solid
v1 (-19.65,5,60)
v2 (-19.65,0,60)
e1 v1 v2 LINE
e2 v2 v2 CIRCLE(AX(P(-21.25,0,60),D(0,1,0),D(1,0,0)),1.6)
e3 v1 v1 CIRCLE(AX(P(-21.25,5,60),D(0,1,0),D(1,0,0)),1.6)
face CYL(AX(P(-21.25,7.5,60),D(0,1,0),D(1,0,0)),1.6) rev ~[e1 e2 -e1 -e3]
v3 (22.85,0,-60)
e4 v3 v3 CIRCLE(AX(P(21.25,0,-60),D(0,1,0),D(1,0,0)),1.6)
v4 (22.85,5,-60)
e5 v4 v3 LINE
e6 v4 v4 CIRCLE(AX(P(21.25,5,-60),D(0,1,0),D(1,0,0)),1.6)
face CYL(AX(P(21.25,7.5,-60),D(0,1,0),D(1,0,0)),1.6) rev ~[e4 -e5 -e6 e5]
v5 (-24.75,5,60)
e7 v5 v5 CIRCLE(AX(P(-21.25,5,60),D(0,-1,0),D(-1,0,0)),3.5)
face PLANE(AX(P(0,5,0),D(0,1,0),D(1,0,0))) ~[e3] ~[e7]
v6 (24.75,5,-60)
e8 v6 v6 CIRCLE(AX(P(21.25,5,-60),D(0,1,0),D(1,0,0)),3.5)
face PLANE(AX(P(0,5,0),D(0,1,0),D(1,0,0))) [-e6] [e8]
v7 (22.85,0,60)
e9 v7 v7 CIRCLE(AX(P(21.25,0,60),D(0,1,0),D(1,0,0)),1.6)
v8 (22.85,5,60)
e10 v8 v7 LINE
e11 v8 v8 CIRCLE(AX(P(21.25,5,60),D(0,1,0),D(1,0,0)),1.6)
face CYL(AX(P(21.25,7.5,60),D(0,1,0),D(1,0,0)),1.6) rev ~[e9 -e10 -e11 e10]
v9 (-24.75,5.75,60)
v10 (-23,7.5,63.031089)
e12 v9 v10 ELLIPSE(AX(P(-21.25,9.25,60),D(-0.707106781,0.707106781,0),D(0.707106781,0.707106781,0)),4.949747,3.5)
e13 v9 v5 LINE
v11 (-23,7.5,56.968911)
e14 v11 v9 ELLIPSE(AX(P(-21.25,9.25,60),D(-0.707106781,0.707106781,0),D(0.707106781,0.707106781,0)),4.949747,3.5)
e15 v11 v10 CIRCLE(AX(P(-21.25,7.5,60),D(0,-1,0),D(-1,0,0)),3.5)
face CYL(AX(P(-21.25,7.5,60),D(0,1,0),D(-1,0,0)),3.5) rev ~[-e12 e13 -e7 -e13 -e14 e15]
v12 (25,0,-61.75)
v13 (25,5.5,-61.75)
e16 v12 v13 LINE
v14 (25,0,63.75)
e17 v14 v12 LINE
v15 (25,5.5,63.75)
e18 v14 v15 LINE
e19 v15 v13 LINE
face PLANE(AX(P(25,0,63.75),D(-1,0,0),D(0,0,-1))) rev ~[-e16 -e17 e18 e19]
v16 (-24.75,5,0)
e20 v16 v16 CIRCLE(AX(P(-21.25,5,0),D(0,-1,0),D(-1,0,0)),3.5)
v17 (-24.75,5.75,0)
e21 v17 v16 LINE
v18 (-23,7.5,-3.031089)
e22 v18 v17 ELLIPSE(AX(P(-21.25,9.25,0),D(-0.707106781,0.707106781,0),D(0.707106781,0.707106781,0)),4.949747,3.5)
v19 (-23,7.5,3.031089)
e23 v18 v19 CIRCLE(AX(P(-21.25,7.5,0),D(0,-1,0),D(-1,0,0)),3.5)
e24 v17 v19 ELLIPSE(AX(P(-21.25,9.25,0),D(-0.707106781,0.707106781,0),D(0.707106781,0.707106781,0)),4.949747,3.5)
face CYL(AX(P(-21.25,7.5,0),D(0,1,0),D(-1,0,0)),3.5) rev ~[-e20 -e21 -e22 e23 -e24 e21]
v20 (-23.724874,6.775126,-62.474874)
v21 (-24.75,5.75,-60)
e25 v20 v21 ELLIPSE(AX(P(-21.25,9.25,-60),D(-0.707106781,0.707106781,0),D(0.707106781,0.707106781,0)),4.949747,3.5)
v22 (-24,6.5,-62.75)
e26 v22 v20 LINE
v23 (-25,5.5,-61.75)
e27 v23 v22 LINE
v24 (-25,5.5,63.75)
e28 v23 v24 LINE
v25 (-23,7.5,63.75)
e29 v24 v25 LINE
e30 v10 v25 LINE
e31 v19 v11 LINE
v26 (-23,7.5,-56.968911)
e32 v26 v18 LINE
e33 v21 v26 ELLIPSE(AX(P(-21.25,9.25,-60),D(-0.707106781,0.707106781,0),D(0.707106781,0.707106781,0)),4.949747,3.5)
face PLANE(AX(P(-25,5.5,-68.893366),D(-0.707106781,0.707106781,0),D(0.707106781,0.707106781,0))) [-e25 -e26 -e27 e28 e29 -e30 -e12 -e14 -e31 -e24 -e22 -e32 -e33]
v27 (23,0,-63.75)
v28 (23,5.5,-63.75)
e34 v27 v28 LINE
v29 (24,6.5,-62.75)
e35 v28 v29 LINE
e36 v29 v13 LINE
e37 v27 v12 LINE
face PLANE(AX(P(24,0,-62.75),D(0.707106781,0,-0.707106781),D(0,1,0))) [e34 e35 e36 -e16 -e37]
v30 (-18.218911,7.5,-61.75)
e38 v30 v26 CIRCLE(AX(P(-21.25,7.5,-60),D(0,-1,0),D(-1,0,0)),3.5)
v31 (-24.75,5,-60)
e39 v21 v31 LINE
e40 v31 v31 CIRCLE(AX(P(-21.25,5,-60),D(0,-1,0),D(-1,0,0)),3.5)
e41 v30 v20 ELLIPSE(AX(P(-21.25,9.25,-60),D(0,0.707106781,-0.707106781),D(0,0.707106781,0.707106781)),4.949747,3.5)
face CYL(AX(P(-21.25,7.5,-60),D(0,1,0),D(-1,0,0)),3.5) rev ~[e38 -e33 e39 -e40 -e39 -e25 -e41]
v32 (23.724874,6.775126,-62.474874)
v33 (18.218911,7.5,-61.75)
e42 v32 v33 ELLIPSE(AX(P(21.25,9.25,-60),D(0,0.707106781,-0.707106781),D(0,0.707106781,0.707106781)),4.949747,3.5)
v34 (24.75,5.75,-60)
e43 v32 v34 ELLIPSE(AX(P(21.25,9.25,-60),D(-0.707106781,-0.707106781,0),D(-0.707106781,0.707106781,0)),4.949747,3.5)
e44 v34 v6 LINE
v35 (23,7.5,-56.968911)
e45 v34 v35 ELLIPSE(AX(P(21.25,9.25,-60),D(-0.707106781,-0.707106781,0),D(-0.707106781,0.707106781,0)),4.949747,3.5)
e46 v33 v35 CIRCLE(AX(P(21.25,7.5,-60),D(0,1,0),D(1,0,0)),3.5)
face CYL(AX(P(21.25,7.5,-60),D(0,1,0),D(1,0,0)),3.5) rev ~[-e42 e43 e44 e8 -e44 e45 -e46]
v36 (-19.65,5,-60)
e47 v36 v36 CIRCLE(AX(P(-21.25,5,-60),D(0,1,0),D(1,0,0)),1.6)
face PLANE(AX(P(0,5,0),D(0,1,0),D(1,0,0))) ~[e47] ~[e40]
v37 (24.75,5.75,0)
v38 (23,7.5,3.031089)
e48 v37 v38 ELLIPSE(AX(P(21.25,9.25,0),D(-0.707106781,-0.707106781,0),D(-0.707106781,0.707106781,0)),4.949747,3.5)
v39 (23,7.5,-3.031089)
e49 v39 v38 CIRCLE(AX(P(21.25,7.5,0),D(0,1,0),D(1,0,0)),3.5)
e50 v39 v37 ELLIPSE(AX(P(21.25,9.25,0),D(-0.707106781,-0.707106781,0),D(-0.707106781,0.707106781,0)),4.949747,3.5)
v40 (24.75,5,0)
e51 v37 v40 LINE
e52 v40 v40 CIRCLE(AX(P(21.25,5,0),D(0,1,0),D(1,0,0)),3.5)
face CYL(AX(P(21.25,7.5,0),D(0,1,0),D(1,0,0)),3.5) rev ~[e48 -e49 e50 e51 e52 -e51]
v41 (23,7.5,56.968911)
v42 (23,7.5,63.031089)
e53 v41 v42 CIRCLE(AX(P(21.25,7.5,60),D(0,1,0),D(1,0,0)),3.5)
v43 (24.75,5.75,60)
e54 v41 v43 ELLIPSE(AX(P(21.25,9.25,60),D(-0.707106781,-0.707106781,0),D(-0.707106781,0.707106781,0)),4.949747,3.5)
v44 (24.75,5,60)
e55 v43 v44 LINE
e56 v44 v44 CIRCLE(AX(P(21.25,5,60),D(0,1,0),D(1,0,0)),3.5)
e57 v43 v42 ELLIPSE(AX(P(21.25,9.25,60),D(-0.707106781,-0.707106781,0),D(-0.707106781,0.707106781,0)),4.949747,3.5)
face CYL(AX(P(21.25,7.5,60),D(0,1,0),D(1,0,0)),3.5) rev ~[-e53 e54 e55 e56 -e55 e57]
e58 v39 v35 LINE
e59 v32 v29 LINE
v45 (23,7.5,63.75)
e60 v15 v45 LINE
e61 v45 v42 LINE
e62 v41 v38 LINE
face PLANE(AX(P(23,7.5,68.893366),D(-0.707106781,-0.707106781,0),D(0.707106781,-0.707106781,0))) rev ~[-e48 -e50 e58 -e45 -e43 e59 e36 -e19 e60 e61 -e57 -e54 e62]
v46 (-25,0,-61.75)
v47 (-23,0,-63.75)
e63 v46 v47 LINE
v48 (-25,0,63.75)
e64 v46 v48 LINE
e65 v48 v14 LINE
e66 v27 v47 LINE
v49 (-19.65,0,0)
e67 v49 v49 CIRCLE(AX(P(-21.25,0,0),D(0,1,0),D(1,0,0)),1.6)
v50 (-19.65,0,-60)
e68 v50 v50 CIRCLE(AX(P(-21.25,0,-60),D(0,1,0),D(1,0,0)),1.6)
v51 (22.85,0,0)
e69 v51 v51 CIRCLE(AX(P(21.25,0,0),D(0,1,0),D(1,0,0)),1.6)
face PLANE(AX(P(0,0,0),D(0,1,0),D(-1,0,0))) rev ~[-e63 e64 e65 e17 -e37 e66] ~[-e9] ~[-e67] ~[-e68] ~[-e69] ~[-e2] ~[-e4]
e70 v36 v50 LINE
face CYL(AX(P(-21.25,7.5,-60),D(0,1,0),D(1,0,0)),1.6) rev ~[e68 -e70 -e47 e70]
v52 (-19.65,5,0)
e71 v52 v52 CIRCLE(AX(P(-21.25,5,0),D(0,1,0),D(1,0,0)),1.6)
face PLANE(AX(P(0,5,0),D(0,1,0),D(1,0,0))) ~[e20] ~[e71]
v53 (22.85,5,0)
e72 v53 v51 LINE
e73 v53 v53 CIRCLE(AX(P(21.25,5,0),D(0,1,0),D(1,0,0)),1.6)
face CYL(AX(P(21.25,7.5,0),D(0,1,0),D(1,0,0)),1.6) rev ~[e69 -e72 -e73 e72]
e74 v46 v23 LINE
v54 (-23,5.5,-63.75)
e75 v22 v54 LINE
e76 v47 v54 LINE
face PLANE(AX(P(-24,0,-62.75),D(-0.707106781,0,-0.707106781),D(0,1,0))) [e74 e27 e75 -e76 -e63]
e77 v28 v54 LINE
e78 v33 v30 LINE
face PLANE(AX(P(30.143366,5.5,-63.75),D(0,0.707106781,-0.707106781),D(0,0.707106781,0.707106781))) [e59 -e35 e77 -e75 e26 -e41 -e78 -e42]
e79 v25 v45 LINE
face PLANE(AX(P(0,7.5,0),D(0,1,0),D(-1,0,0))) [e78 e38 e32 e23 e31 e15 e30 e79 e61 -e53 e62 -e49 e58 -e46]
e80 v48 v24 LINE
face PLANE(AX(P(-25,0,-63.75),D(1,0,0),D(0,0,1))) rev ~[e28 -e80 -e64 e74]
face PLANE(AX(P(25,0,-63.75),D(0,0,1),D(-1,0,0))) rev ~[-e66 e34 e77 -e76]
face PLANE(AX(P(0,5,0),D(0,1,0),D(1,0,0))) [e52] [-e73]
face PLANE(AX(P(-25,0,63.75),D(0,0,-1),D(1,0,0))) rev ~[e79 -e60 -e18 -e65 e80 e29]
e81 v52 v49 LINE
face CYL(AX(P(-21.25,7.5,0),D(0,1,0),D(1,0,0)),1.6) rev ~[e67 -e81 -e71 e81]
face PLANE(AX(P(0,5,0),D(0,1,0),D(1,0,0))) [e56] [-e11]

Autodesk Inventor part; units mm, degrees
ref_plane "YZ Plane" through (0, 0, 0) normal (1, 0, 0) x (0, 1, 0)
ref_plane "XZ Plane" through (0, 0, 0) normal (0, 1, 0) x (-1, 0, 0)
ref_plane "XY Plane" through (0, 0, 0) normal (0, 0, 1) x (1, 0, 0)
sketch "Sketch1" plane through (0, 0, 0) normal (0, 1, 0) x (-1, 0, 0)
  line L0 (25, 63.75) -> (-25, 63.75)
  line L1 (-25, 63.75) -> (-25, -63.75)
  line L2 (-25, -63.75) -> (25, -63.75)
  line L3 (25, -63.75) -> (25, 63.75)
  point P0 (0, 0)
  dimension "d0" = 50
  dimension "d1" = 127.5
  dimension "d2" = 25
  dimension "d3" = 63.75
extrude "Extrusion1" add sketch "Sketch1" along normal blind 7.5
sketch "Sketch2" plane through (0, 7.5, 0) normal (0, 1, 0) x (1, 0, 0)
  circle A0 centre (-21.25, -60) radius 1.6
  circle A1 centre (-21.25, 60) radius 1.6
  circle A2 centre (21.25, -60) radius 1.6
  circle A3 centre (21.25, 60) radius 1.6
  circle A4 centre (-21.25, 0) radius 1.6
  circle A5 centre (21.25, 0) radius 1.6
  line L0 (25, -63.75) -> (25, 63.75) projected
  line L1 (25, 63.75) -> (-25, 63.75) projected
  line L2 (-25, -63.75) -> (25, -63.75) projected
  line L3 (-25, 63.75) -> (-25, -63.75) projected
  point P0 (0, 0)
  dimension "d6" = 3.2
  dimension "d7" = 3.2
  dimension "d8" = 3.2
  dimension "d9" = 3.2
  dimension "d10" = 3.2
  dimension "d11" = 3.2
  dimension "d12" = 3.75
  dimension "d13" = 3.75
  dimension "d14" = 3.75
  dimension "d15" = 3.75
  dimension "d16" = 3.75
  dimension "d17" = 3.75
  dimension "d18" = 3.75
  dimension "d19" = 3.75
  dimension "d20" = 3.75
  dimension "d21" = 3.75
  dimension "d22" = 63.75
  dimension "d23" = 63.75
extrude "Extrusion2" cut sketch "Sketch2" against normal through all contours A0 | A1 | A2 | A3 | A4 | A5
sketch "Sketch3" plane through (0, 7.5, 0) normal (0, 1, 0) x (1, 0, 0)
  circle A0 centre (21.25, -60) radius 1.6 projected
  circle A1 centre (21.25, -60) radius 3.5
  circle A2 centre (21.25, 0) radius 1.6 projected
  circle A3 centre (21.25, 0) radius 3.5
  circle A4 centre (21.25, 60) radius 3.5
  line L0 (25, 63.75) -> (-25, 63.75) projected
  line L1 (25, -63.75) -> (25, 63.75) projected
  point P0 (0, 0)
  dimension "d26" = 7
  dimension "d27" = 7
  dimension "d28" = 7
  dimension "d29" = 3.75
  dimension "d30" = 3.75
extrude "Extrusion3" cut sketch "Sketch3" against normal blind 2.5
mirror "Mirror1" about plane through (0, 0, 0) normal (1, 0, 0) of "Extrusion3"
chamfer "Chamfer1" distance 2 angle 45 3 edges at (25, 7.5, 0) (0, 7.5, -63.75) (-25, 7.5, 0)
chamfer "Chamfer2" distance 2 angle 45 2 edges at (-25, 2.75, -63.75) (25, 2.75, -63.75)
equation "\"d2\" = 0.5 * d0"
equation "\"d3\" = 0.5 * d1"
equation "\"d12\" = 0.5 * Thickness"
equation "\"d13\" = 0.5 * Thickness"
equation "\"d14\" = 0.5 * Thickness"
equation "\"d15\" = 0.5 * Thickness"
equation "\"d16\" = 0.5 * Thickness"
equation "\"d17\" = 0.5 * Thickness"
equation "\"d18\" = 0.5 * Thickness"
equation "\"d19\" = 0.5 * Thickness"
equation "\"d20\" = 0.5 * Thickness"
equation "\"d21\" = 0.5 * Thickness"
equation "\"d22\" = 0.5 * d1"
equation "\"d23\" = 0.5 * d1"
equation "\"d29\" = 0.5 * Thickness"
equation "\"d30\" = 0.5 * Thickness"
equation "\"Thickness\" = 7.5"
properties part number "Top Covers"
